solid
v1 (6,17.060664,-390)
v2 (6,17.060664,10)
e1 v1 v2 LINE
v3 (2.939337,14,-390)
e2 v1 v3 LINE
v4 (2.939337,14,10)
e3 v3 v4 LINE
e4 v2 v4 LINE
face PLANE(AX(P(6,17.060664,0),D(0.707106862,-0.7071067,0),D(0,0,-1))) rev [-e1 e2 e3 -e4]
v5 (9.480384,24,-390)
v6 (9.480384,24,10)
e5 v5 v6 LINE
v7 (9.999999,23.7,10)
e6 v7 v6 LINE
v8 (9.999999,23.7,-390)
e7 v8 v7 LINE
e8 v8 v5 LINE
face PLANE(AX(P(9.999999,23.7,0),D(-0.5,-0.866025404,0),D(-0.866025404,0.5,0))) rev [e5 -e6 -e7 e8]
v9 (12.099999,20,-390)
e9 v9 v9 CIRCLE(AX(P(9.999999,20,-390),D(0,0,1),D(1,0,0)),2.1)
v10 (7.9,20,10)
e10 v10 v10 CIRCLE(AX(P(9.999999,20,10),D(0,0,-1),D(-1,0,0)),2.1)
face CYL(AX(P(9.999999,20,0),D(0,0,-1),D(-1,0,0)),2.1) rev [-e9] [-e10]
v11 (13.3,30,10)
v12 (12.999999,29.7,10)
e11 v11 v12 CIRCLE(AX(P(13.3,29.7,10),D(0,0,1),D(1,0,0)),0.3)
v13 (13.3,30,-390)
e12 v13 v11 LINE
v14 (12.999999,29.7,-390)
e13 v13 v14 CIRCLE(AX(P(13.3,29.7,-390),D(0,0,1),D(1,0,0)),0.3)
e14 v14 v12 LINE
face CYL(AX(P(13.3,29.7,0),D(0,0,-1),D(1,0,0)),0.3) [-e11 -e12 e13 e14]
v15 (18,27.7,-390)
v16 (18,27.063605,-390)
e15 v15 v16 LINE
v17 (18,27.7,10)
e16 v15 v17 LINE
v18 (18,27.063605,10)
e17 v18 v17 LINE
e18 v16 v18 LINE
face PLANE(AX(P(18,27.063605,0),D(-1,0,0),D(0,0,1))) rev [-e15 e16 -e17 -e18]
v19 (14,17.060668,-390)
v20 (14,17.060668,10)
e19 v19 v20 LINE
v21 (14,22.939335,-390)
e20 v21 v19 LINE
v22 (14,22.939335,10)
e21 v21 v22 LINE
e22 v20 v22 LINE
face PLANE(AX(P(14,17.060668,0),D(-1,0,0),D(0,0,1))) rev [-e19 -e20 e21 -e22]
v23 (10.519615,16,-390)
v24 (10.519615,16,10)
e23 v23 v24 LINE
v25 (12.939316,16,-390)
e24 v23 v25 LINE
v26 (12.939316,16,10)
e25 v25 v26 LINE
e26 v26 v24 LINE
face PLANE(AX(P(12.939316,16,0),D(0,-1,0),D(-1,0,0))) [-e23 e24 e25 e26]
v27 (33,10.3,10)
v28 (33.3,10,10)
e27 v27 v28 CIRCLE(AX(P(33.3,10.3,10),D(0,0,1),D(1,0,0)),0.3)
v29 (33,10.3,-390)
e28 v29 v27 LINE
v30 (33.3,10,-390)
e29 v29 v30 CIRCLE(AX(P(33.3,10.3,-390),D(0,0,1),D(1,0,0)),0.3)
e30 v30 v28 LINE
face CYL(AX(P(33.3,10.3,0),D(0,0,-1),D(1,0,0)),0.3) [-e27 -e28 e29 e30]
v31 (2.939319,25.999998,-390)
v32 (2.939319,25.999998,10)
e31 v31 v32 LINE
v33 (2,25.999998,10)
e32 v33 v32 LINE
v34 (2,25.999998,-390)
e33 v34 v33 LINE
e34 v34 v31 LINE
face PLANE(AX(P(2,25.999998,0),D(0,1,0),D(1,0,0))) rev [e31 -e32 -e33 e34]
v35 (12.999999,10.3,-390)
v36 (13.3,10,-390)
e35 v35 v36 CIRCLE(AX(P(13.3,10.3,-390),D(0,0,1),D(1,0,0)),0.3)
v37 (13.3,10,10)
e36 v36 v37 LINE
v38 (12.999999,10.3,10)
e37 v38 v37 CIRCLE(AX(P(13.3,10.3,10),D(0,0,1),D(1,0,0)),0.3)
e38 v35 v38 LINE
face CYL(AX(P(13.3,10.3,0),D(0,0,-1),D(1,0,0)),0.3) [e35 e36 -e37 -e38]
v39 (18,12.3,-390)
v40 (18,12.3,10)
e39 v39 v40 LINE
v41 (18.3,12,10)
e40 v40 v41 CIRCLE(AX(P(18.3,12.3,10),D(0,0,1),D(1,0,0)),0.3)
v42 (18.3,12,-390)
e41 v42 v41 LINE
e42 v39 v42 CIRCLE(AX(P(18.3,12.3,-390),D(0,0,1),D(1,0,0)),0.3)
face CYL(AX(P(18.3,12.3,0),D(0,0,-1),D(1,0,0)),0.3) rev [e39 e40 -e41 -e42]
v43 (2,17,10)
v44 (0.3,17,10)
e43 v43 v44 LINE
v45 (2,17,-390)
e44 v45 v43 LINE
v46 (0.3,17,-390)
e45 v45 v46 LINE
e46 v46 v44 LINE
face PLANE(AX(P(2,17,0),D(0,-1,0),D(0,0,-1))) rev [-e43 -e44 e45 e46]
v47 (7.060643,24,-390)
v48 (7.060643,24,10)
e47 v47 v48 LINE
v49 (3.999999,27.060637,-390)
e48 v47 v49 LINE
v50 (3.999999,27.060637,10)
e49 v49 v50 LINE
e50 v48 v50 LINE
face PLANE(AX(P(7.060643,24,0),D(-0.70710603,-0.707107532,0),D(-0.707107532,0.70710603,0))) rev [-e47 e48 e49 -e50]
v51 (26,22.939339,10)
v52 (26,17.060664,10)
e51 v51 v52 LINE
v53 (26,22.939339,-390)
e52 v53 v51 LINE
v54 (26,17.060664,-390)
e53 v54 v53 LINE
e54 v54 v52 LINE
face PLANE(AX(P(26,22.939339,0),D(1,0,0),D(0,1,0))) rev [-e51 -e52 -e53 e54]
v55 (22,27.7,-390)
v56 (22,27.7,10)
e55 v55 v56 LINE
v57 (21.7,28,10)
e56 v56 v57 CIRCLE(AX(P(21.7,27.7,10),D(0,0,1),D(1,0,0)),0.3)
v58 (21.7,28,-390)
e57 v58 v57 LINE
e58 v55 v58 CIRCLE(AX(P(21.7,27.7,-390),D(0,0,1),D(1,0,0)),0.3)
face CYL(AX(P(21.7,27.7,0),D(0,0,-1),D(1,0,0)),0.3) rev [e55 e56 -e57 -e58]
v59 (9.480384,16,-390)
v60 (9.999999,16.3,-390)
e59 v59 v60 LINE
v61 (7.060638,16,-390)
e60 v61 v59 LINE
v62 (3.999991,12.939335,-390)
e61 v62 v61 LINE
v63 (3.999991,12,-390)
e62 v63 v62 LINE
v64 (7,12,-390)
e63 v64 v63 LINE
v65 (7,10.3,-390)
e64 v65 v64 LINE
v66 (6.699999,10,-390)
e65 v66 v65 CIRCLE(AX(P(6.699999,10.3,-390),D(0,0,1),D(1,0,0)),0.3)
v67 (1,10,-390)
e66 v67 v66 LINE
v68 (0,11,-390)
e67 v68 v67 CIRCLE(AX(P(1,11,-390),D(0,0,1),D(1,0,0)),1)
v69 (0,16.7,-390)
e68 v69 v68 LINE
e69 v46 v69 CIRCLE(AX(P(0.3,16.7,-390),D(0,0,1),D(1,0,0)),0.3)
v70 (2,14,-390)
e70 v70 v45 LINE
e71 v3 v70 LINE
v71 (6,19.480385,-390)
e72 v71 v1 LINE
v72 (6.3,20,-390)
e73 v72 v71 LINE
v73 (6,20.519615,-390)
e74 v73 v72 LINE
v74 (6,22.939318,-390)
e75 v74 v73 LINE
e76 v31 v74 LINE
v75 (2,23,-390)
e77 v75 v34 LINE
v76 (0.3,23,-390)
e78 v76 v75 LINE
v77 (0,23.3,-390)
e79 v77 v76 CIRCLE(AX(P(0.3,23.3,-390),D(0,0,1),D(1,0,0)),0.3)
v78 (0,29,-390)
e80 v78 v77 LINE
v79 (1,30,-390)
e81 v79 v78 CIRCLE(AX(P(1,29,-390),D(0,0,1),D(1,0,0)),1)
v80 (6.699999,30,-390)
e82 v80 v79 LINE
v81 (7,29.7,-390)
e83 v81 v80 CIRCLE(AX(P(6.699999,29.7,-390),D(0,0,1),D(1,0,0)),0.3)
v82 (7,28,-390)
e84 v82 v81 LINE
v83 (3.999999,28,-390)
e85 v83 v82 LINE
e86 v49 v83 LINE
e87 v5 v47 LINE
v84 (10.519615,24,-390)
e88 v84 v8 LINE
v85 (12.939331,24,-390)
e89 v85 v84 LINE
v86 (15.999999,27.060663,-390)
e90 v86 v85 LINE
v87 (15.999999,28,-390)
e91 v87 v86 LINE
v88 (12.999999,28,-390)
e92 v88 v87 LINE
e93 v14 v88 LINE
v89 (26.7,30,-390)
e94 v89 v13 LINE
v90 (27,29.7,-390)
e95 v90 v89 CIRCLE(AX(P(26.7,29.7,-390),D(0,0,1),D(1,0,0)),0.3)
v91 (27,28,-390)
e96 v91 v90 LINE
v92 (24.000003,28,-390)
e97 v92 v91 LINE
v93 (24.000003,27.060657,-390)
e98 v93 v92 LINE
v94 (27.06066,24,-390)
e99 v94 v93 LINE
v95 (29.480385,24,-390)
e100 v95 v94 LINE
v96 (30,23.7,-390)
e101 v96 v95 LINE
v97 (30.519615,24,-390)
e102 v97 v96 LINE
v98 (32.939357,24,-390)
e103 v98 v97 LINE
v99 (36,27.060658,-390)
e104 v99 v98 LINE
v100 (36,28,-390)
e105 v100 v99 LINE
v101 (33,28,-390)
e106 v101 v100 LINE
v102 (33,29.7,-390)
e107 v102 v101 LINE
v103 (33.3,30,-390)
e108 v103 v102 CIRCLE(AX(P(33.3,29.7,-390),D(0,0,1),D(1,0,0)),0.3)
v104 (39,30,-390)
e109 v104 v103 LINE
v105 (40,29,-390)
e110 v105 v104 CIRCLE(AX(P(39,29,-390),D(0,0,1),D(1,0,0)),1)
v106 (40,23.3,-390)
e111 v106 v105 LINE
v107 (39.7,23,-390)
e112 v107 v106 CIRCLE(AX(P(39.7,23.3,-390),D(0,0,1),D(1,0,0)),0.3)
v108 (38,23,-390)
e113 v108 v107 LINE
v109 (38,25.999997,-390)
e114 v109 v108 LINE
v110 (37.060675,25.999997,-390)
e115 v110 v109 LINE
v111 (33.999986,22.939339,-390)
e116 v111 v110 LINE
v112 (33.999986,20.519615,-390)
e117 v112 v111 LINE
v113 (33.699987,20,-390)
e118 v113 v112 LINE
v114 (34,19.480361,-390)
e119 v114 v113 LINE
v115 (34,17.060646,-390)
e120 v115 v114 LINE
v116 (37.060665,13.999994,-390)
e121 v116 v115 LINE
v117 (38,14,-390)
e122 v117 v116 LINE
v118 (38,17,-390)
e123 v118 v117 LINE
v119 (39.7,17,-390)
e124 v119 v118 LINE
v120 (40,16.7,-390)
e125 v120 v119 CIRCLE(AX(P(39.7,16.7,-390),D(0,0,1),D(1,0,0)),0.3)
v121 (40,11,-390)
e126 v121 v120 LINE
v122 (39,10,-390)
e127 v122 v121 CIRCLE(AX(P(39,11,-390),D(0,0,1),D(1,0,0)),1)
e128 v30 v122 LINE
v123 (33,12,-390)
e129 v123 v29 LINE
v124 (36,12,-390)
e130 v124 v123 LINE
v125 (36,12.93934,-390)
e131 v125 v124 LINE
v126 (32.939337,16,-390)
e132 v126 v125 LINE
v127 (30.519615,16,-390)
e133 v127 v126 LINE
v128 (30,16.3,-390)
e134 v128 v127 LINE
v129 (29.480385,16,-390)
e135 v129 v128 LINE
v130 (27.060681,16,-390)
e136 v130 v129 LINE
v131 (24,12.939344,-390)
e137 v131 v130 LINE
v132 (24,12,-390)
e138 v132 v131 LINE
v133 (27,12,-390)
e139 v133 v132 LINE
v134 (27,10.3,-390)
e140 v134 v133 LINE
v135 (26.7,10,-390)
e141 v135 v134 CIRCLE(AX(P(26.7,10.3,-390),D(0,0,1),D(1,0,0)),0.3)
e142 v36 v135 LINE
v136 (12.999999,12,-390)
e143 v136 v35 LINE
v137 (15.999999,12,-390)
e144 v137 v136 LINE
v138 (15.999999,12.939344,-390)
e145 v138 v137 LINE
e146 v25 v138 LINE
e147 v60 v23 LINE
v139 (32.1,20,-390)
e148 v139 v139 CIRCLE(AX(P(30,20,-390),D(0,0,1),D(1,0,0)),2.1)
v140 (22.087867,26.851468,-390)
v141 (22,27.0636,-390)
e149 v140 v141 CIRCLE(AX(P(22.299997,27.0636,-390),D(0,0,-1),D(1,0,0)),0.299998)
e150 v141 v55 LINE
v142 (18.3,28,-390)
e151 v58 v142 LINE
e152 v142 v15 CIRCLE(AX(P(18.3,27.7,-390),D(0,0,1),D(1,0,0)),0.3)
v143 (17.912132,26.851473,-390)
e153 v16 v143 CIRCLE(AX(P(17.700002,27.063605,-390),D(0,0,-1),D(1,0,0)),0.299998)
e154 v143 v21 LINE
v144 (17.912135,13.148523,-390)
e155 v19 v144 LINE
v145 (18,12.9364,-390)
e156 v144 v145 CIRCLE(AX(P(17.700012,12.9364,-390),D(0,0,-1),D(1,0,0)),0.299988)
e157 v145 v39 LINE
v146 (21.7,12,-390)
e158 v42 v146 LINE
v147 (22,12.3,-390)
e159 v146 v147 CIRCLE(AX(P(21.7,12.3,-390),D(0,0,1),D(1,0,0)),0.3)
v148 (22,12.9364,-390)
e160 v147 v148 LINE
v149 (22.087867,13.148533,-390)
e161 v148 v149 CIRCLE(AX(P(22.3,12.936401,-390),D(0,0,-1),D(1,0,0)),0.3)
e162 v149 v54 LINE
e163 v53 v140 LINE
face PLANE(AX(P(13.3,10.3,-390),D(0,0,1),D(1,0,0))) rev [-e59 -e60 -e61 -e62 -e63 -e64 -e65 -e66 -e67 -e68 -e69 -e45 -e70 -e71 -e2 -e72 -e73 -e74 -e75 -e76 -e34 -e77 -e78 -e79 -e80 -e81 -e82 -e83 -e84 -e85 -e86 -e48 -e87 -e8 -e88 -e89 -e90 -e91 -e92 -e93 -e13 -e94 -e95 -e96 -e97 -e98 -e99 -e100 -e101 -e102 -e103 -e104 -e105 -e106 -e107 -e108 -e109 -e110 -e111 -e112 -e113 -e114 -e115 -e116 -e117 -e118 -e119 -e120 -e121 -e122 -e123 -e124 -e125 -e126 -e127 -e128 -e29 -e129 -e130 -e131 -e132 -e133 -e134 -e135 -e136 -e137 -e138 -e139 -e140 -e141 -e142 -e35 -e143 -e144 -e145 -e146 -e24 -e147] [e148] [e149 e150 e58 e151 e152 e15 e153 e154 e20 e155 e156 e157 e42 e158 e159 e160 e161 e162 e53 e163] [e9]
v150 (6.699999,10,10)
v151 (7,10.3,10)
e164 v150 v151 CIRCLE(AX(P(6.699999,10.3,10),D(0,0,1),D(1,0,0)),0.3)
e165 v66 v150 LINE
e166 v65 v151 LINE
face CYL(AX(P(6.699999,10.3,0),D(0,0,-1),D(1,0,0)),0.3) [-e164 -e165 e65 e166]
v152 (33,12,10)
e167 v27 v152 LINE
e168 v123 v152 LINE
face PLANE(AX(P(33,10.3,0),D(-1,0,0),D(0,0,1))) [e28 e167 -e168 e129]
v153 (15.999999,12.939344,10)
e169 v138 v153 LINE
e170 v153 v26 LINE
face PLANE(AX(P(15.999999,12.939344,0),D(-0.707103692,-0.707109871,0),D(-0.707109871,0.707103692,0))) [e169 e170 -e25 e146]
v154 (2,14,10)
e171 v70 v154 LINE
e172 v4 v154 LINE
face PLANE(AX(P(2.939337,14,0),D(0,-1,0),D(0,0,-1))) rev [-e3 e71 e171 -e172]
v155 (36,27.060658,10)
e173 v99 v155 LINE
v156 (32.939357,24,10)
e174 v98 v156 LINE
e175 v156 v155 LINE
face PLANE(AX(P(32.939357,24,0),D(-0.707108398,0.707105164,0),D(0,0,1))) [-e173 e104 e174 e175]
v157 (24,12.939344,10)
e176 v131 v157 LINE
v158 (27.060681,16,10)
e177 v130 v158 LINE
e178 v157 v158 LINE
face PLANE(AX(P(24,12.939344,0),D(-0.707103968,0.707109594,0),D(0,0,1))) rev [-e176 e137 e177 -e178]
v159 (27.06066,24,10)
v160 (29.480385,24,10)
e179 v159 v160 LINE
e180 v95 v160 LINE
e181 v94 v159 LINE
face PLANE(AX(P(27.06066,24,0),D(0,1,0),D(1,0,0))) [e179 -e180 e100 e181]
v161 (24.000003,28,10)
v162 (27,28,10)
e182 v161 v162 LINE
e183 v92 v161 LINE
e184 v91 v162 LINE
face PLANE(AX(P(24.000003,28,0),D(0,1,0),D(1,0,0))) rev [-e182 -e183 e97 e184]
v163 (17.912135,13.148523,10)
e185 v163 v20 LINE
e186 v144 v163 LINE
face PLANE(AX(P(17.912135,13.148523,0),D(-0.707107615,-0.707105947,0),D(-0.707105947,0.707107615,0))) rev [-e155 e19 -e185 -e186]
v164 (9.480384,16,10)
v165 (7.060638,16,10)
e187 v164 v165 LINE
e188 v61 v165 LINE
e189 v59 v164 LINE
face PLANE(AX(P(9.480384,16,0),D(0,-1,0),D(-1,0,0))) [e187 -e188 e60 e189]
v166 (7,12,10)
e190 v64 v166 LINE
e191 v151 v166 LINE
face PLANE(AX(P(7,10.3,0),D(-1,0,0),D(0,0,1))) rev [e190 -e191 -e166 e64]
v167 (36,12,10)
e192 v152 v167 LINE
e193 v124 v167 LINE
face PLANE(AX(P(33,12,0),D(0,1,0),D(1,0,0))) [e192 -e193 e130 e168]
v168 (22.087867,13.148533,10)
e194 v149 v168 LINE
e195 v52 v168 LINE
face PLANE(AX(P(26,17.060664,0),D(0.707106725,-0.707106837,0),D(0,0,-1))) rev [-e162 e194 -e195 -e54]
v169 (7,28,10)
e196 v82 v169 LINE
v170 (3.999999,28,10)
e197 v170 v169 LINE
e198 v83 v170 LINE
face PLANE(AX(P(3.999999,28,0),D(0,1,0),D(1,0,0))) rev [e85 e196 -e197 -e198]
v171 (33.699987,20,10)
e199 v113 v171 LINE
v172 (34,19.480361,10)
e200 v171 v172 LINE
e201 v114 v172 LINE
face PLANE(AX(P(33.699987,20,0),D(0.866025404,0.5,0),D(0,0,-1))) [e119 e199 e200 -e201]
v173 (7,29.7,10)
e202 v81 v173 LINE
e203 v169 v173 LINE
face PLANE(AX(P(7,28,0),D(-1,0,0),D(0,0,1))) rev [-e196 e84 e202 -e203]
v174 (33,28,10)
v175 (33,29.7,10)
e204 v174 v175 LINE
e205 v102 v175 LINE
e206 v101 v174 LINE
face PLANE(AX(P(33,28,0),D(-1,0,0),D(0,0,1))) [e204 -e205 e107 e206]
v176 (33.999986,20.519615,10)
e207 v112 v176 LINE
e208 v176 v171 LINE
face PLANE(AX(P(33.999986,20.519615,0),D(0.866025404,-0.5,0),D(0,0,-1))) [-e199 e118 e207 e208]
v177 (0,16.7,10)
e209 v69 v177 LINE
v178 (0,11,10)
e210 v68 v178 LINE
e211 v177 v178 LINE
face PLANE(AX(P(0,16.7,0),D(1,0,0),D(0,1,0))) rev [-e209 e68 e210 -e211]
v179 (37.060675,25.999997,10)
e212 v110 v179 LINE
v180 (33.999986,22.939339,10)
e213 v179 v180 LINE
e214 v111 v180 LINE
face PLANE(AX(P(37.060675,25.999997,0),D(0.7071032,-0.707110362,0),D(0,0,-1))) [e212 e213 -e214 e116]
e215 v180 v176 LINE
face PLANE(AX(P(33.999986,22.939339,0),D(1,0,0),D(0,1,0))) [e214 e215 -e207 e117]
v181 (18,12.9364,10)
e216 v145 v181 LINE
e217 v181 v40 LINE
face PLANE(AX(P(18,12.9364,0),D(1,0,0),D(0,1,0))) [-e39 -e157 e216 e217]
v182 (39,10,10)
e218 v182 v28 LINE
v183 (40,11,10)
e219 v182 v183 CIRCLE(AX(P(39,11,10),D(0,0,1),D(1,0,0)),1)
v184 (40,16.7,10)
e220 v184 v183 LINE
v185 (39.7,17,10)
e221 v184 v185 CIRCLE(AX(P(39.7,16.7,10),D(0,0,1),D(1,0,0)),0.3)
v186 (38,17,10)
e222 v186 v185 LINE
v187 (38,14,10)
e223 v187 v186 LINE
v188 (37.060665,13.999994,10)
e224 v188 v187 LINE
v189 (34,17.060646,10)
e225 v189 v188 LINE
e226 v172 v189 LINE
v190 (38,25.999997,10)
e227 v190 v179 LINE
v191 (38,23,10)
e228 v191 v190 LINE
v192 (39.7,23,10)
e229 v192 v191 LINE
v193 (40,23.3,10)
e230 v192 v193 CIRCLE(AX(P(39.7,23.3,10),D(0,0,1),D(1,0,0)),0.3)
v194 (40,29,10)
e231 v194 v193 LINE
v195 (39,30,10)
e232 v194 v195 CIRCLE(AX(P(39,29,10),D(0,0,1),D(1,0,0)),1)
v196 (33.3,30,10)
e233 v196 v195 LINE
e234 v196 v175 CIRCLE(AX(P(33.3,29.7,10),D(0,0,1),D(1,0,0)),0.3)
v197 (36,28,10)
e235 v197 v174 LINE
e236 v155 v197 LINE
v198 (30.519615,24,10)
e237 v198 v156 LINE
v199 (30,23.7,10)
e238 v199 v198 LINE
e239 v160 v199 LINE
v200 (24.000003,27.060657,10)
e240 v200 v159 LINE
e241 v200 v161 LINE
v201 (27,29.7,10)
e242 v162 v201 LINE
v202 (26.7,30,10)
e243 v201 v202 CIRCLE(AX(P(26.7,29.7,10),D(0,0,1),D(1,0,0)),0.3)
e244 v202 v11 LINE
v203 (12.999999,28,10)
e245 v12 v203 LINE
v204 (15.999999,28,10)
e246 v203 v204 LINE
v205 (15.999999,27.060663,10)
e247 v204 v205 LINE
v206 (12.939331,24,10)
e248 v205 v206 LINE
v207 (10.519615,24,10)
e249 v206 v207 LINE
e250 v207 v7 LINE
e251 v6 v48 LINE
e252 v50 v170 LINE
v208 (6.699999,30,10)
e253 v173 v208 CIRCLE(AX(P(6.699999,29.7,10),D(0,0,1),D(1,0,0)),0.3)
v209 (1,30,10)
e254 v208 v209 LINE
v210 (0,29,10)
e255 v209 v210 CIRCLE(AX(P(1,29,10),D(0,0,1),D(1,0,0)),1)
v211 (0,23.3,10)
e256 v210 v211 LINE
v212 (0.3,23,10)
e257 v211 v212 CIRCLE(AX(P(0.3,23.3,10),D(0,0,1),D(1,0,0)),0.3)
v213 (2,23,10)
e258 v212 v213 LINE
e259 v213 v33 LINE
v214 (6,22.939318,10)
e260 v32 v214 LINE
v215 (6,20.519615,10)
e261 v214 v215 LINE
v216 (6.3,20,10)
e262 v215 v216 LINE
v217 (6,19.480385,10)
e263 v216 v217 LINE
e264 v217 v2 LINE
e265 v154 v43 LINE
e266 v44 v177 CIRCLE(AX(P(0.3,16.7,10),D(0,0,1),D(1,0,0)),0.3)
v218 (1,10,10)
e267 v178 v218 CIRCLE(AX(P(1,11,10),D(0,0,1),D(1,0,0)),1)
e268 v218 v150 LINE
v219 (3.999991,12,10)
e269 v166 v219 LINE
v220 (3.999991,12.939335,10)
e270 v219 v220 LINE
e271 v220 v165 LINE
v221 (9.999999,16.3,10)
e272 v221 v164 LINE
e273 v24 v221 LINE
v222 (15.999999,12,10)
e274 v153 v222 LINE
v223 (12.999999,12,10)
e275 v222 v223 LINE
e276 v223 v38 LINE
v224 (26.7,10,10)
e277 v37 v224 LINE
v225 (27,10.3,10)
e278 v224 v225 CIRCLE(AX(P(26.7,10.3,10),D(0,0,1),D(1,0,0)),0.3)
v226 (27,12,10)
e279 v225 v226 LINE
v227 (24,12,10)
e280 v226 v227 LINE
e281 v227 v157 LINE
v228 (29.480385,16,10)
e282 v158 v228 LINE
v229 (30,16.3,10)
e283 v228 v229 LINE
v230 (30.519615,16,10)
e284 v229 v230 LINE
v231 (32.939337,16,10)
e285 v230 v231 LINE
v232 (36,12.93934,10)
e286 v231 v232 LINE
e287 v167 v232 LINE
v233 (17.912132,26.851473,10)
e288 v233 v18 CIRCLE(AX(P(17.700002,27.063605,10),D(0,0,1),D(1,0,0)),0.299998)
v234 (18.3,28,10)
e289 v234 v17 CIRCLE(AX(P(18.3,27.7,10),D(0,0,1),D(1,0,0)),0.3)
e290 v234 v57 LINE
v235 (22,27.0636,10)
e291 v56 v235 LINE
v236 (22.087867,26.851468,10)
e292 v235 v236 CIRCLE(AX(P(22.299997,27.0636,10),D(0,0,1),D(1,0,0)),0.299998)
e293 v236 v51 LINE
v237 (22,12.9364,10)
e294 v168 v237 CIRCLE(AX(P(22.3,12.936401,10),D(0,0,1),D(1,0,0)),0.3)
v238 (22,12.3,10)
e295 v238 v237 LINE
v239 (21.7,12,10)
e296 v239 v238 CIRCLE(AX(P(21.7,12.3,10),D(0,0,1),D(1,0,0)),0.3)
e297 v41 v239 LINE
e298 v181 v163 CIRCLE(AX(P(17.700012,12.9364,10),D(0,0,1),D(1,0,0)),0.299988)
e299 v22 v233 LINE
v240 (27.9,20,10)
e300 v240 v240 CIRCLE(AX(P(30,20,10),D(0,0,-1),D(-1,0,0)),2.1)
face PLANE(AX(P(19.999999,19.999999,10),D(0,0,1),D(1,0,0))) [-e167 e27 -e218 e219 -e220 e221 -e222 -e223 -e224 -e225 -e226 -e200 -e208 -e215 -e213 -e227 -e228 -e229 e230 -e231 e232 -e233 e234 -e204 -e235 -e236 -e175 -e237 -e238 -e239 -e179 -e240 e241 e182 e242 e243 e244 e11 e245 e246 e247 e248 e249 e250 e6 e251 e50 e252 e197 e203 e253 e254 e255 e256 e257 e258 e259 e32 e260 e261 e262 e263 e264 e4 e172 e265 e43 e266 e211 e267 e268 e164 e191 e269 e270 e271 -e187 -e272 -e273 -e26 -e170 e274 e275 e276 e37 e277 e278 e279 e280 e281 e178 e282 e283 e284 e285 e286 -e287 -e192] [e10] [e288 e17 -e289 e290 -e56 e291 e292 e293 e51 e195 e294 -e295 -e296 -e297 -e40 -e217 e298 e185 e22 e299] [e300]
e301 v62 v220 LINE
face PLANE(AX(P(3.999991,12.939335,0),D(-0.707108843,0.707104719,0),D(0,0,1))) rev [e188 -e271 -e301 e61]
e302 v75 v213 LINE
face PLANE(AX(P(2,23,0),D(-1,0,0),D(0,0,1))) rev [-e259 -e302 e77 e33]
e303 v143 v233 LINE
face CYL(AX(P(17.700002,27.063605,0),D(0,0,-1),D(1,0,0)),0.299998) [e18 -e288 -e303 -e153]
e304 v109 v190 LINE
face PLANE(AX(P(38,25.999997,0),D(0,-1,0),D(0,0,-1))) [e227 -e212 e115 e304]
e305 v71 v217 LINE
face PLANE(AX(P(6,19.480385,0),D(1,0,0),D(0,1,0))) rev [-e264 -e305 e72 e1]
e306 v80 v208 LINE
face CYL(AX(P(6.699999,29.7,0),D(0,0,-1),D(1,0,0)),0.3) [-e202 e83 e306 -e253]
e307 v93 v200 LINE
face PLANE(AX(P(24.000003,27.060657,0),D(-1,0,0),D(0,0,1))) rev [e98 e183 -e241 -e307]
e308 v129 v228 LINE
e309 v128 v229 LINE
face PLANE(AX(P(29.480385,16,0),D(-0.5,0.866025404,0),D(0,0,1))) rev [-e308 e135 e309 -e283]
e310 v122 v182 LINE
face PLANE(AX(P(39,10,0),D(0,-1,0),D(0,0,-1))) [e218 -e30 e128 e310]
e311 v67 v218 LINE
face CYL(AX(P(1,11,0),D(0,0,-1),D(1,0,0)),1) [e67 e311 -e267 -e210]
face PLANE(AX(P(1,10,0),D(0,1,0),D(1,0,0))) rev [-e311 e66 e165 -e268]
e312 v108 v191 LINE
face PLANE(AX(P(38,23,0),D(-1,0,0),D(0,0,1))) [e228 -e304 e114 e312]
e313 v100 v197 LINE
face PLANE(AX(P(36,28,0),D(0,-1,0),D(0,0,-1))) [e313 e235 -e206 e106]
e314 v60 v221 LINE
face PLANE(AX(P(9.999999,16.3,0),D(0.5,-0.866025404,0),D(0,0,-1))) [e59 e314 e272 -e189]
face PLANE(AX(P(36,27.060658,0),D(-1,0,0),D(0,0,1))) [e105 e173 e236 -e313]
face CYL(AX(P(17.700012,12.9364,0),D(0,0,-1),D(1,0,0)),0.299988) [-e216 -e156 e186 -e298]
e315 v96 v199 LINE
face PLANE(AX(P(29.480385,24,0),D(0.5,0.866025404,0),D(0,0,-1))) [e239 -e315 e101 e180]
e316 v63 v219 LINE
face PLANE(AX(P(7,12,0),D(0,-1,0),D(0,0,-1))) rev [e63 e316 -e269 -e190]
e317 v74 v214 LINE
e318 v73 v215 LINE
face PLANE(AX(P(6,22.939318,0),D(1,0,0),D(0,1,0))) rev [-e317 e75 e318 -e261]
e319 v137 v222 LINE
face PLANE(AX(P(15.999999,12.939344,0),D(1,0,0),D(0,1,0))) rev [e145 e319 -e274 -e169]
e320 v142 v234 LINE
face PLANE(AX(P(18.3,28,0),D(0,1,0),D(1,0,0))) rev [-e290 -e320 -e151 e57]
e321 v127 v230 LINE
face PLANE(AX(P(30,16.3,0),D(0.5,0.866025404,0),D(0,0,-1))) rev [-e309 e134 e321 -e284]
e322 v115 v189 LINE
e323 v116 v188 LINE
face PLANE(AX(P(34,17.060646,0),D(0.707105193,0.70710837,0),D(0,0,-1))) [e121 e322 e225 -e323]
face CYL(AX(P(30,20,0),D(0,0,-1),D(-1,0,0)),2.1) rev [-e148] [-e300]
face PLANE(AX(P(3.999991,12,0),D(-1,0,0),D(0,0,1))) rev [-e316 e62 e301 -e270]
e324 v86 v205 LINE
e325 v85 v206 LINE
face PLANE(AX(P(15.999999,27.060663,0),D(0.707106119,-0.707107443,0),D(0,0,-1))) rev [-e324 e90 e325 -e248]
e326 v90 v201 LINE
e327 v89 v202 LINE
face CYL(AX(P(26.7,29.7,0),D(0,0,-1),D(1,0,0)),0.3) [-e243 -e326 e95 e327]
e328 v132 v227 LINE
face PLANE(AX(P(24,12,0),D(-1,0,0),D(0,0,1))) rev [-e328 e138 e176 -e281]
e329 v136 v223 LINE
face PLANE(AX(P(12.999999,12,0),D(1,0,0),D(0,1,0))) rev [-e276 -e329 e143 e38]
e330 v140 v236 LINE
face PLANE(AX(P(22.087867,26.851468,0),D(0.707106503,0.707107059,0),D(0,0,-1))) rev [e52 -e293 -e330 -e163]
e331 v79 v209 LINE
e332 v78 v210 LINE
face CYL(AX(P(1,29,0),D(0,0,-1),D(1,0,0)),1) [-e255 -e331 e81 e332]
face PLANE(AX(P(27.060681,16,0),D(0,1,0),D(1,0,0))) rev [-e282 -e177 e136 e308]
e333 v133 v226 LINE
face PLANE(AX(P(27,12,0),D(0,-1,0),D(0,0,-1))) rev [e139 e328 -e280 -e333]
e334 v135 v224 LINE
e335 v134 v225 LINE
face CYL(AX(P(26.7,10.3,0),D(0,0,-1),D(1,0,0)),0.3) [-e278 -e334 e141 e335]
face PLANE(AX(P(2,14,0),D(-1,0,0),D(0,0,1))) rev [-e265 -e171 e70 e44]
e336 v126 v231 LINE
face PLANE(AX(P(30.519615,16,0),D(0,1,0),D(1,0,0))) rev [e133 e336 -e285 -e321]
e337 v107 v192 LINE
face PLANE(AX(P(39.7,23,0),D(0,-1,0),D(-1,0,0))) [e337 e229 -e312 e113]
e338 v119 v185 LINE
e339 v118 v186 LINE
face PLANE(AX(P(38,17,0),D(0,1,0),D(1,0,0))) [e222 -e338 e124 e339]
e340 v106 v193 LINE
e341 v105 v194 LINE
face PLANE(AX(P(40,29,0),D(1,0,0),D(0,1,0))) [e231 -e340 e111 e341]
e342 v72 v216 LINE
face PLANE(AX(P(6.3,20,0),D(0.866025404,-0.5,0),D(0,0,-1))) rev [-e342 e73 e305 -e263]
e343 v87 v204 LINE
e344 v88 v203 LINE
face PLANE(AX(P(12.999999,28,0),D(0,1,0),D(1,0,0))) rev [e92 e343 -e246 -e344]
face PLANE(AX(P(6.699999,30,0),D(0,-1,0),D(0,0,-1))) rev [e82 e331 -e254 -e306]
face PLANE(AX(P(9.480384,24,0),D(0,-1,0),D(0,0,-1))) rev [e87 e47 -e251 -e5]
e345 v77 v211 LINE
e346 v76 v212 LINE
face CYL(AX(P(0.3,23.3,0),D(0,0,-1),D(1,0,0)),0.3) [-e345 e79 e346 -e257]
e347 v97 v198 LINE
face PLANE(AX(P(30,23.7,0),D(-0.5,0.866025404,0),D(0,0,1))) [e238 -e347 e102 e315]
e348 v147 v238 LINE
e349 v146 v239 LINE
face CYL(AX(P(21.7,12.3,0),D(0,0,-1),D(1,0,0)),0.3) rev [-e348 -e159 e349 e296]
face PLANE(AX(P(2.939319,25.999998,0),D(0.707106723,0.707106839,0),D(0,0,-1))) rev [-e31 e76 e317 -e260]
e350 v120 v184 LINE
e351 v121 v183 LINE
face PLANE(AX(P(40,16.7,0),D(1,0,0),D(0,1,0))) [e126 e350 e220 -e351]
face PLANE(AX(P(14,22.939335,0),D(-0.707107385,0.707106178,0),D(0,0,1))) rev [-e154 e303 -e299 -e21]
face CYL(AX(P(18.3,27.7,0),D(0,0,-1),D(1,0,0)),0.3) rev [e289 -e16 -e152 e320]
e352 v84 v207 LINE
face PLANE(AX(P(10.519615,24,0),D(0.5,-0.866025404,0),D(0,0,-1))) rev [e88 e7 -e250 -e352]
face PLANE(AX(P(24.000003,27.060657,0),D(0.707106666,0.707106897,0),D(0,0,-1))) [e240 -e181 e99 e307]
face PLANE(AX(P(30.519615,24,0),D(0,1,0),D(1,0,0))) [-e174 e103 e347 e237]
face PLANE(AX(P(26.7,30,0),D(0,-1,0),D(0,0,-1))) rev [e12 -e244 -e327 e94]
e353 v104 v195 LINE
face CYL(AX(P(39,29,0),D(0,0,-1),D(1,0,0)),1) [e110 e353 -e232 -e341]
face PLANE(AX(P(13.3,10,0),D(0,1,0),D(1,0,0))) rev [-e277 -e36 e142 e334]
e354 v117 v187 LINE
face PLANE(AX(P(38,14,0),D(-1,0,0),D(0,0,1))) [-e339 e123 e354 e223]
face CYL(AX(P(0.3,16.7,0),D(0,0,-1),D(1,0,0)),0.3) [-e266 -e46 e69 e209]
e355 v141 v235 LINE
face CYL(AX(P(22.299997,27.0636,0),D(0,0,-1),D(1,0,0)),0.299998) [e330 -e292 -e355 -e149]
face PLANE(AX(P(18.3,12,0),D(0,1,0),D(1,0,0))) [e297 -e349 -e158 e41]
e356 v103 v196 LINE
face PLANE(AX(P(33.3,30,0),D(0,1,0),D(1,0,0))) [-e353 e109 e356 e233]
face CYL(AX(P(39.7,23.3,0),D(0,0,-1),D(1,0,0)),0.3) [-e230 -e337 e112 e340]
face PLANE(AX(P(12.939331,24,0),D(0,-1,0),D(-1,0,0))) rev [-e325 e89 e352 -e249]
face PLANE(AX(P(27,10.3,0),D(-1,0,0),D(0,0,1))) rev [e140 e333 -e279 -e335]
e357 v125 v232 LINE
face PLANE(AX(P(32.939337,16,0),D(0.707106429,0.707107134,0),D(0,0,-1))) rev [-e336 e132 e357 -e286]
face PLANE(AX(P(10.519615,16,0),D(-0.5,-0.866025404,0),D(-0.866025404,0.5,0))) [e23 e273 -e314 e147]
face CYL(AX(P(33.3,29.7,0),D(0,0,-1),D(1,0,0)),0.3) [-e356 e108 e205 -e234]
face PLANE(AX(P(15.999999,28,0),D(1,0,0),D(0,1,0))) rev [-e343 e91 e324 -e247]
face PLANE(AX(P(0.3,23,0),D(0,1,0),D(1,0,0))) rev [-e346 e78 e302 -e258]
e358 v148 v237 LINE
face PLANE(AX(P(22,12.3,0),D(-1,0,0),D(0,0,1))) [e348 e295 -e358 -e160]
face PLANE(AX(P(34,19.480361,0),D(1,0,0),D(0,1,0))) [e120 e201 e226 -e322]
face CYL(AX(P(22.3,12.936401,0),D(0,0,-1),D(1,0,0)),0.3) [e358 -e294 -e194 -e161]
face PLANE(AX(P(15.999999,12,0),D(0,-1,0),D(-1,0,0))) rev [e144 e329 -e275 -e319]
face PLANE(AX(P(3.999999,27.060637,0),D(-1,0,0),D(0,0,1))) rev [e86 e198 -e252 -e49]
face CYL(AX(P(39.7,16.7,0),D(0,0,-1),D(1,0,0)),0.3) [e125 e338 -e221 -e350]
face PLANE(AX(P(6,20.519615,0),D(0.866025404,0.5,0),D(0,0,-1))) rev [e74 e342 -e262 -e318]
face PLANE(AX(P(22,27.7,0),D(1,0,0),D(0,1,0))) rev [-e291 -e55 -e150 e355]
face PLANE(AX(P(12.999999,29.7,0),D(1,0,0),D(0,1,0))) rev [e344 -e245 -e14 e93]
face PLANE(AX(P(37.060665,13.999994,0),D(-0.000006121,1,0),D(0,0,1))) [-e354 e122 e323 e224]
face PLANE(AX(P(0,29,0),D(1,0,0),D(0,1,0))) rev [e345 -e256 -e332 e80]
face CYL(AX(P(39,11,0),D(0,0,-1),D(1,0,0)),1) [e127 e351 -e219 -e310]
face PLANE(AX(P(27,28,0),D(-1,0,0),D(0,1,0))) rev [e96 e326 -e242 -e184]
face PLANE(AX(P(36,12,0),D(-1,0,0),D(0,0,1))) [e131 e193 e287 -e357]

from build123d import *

# Parameters (mm, degrees)
SKETCH1_R           = 2.0999999
BOSS_EXTRUDE2_DEPTH = 400


# Read off the part's stored shape, not the designer's step: Imported1
with BuildPart() as part:
    # Sketch1 → Boss-Extrude2 (new body)
    with BuildSketch(Plane.XY.offset(10)):
        with BuildLine():
            Line((15.999999496, 12), (12.9999995, 12))
            Line((12.9999995, 12), (12.9999995, 10.3))
            ThreePointArc((12.9999995, 10.3), (13.087867466, 10.087867966), (13.2999995, 10))
            Line((13.2999995, 10), (26.7, 10))
            ThreePointArc((26.7, 10), (26.912132034, 10.087867966), (27, 10.3))
            Line((27, 10.3), (27, 12))
            Line((27, 12), (24, 12))
            Line((24, 12), (24, 12.9393436))
            Line((24, 12.9393436), (27.06068075, 16))
            Line((27.06068075, 16), (29.480384758, 16))
            Line((29.480384758, 16), (30, 16.3))
            Line((30, 16.3), (30.519615242, 16))
            Line((30.519615242, 16), (32.93933675, 16))
            Line((32.93933675, 16), (36, 12.9393398))
            Line((36, 12.9393398), (36, 12))
            Line((36, 12), (33, 12))
            Line((33, 12), (33, 10.3))
            ThreePointArc((33, 10.3), (33.087867966, 10.087867966), (33.3, 10))
            Line((33.3, 10), (39, 10))
            ThreePointArc((39, 10), (39.707106781, 10.292893219), (40, 11))
            Line((40, 11), (40, 16.7))
            ThreePointArc((40, 16.7), (39.912132034, 16.912132034), (39.7, 17))
            Line((39.7, 17), (38, 17))
            Line((38, 17), (38, 14))
            Line((38, 14), (37.0606655, 13.99999425))
            Line((37.0606655, 13.99999425), (34, 17.060646))
            Line((34, 17.060646), (34, 19.480361375))
            Line((34, 19.480361375), (33.6999865, 20))
            Line((33.6999865, 20), (33.9999865, 20.519615242))
            Line((33.9999865, 20.519615242), (33.9999865, 22.9393395))
            Line((33.9999865, 22.9393395), (37.060675, 25.999997))
            Line((37.060675, 25.999997), (38, 25.999997))
            Line((38, 25.999997), (38, 23))
            Line((38, 23), (39.7, 23))
            ThreePointArc((39.7, 23), (39.912132034, 23.087867966), (40, 23.3))
            Line((40, 23.3), (40, 29))
            ThreePointArc((40, 29), (39.707106781, 29.707106781), (39, 30))
            Line((39, 30), (33.3, 30))
            ThreePointArc((33.3, 30), (33.087867966, 29.912132034), (33, 29.7))
            Line((33, 29.7), (33, 28))
            Line((33, 28), (36, 28))
            Line((36, 28), (36, 27.0606575))
            Line((36, 27.0606575), (32.9393565, 24))
            Line((32.9393565, 24), (30.519615242, 24))
            Line((30.519615242, 24), (30, 23.7))
            Line((30, 23.7), (29.480384758, 24))
            Line((29.480384758, 24), (27.06066, 24))
            Line((27.06066, 24), (24.0000025, 27.0606565))
            Line((24.0000025, 27.0606565), (24.0000025, 28))
            Line((24.0000025, 28), (27, 28))
            Line((27, 28), (27, 29.7))
            ThreePointArc((27, 29.7), (26.912132034, 29.912132034), (26.7, 30))
            Line((26.7, 30), (13.2999995, 30))
            ThreePointArc((13.2999995, 30), (13.087867466, 29.912132034), (12.9999995, 29.7))
            Line((12.9999995, 29.7), (12.9999995, 28))
            Line((12.9999995, 28), (15.9999995, 28))
            Line((15.9999995, 28), (15.9999995, 27.06066257))
            Line((15.9999995, 27.06066257), (12.9393312, 24))
            Line((12.9393312, 24), (10.519614742, 24))
            Line((10.519614742, 24), (9.9999995, 23.7))
            Line((9.9999995, 23.7), (9.480384258, 24))
            Line((9.480384258, 24), (7.0606425, 24))
            Line((7.0606425, 24), (3.9999995, 27.0606365))
            Line((3.9999995, 27.0606365), (3.9999995, 28))
            Line((3.9999995, 28), (6.9999995, 28))
            Line((6.9999995, 28), (6.9999995, 29.7))
            ThreePointArc((6.9999995, 29.7), (6.912131534, 29.912132034), (6.6999995, 30))
            Line((6.6999995, 30), (1, 30))
            ThreePointArc((1, 30), (0.292893219, 29.707106781), (0, 29))
            Line((0, 29), (0, 23.3))
            ThreePointArc((0, 23.3), (0.087867966, 23.087867966), (0.3, 23))
            Line((0.3, 23), (2, 23))
            Line((2, 23), (2, 25.999998))
            Line((2, 25.999998), (2.9393195, 25.999998))
            Line((2.9393195, 25.999998), (6, 22.939318))
            Line((6, 22.939318), (6, 20.519615242))
            Line((6, 20.519615242), (6.3, 20))
            Line((6.3, 20), (6, 19.480384758))
            Line((6, 19.480384758), (6, 17.0606635))
            Line((6, 17.0606635), (2.9393372, 14))
            Line((2.9393372, 14), (2, 14))
            Line((2, 14), (2, 17))
            Line((2, 17), (0.3, 17))
            ThreePointArc((0.3, 17), (0.087867966, 16.912132034), (0, 16.7))
            Line((0, 16.7), (0, 11))
            ThreePointArc((0, 11), (0.292893219, 10.292893219), (1, 10))
            Line((1, 10), (6.6999995, 10))
            ThreePointArc((6.6999995, 10), (6.912131534, 10.087867966), (6.9999995, 10.3))
            Line((6.9999995, 10.3), (6.9999995, 12))
            Line((6.9999995, 12), (3.999991, 12))
            Line((3.999991, 12), (3.999991, 12.93933465))
            Line((3.999991, 12.93933465), (7.0606385, 16))
            Line((7.0606385, 16), (9.480384258, 16))
            Line((9.480384258, 16), (9.9999995, 16.3))
            Line((9.9999995, 16.3), (10.519614742, 16))
            Line((10.519614742, 16), (12.93931635, 16))
            Line((12.93931635, 16), (15.999999496, 12.9393436))
            Line((15.999999496, 12.9393436), (15.999999496, 12))
        make_face()
        with Locations(Location((9.9999995, 20, 0), (0, 0, 180))):
            Circle(SKETCH1_R, mode=Mode.SUBTRACT)
        with Locations(Location((30, 20, 0), (0, 0, 180))):
            Circle(SKETCH1_R, mode=Mode.SUBTRACT)
        with BuildLine():
            Line((17.99999975, 12.936400074), (17.99999975, 12.3))
            ThreePointArc((17.99999975, 12.3), (18.087867716, 12.087867966), (18.29999975, 12))
            Line((18.29999975, 12), (21.6999995, 12))
            ThreePointArc((21.6999995, 12), (21.912131534, 12.087867966), (21.9999995, 12.3))
            Line((21.9999995, 12.3), (21.9999995, 12.936400498))
            ThreePointArc((21.9999995, 12.936400498), (22.022835631, 13.051205559), (22.087867469, 13.148532591))
            Line((22.087867469, 13.148532591), (26, 17.0606645))
            Line((26, 17.0606645), (26, 22.939339))
            Line((26, 22.939339), (22.087867469, 26.851468459))
            ThreePointArc((22.087867469, 26.851468459), (22.022835646, 26.948794955), (21.9999995, 27.063599552))
            Line((21.9999995, 27.063599552), (21.9999995, 27.7))
            ThreePointArc((21.9999995, 27.7), (21.912131534, 27.912132034), (21.6999995, 28))
            Line((21.6999995, 28), (18.29999975, 28))
            ThreePointArc((18.29999975, 28), (18.087867716, 27.912132034), (17.99999975, 27.7))
            Line((17.99999975, 27.7), (17.99999975, 27.063604538))
            ThreePointArc((17.99999975, 27.063604538), (17.977163602, 26.948799949), (17.912131781, 26.851473459))
            Line((17.912131781, 26.851473459), (14, 22.939335))
            Line((14, 22.939335), (14, 17.06066805))
            Line((14, 17.06066805), (17.912135369, 13.14852345))
            ThreePointArc((17.912135369, 13.14852345), (17.977164541, 13.051200418), (17.99999975, 12.936400074))
        make_face(mode=Mode.SUBTRACT)
    extrude(amount=-BOSS_EXTRUDE2_DEPTH)


solid = part.part
